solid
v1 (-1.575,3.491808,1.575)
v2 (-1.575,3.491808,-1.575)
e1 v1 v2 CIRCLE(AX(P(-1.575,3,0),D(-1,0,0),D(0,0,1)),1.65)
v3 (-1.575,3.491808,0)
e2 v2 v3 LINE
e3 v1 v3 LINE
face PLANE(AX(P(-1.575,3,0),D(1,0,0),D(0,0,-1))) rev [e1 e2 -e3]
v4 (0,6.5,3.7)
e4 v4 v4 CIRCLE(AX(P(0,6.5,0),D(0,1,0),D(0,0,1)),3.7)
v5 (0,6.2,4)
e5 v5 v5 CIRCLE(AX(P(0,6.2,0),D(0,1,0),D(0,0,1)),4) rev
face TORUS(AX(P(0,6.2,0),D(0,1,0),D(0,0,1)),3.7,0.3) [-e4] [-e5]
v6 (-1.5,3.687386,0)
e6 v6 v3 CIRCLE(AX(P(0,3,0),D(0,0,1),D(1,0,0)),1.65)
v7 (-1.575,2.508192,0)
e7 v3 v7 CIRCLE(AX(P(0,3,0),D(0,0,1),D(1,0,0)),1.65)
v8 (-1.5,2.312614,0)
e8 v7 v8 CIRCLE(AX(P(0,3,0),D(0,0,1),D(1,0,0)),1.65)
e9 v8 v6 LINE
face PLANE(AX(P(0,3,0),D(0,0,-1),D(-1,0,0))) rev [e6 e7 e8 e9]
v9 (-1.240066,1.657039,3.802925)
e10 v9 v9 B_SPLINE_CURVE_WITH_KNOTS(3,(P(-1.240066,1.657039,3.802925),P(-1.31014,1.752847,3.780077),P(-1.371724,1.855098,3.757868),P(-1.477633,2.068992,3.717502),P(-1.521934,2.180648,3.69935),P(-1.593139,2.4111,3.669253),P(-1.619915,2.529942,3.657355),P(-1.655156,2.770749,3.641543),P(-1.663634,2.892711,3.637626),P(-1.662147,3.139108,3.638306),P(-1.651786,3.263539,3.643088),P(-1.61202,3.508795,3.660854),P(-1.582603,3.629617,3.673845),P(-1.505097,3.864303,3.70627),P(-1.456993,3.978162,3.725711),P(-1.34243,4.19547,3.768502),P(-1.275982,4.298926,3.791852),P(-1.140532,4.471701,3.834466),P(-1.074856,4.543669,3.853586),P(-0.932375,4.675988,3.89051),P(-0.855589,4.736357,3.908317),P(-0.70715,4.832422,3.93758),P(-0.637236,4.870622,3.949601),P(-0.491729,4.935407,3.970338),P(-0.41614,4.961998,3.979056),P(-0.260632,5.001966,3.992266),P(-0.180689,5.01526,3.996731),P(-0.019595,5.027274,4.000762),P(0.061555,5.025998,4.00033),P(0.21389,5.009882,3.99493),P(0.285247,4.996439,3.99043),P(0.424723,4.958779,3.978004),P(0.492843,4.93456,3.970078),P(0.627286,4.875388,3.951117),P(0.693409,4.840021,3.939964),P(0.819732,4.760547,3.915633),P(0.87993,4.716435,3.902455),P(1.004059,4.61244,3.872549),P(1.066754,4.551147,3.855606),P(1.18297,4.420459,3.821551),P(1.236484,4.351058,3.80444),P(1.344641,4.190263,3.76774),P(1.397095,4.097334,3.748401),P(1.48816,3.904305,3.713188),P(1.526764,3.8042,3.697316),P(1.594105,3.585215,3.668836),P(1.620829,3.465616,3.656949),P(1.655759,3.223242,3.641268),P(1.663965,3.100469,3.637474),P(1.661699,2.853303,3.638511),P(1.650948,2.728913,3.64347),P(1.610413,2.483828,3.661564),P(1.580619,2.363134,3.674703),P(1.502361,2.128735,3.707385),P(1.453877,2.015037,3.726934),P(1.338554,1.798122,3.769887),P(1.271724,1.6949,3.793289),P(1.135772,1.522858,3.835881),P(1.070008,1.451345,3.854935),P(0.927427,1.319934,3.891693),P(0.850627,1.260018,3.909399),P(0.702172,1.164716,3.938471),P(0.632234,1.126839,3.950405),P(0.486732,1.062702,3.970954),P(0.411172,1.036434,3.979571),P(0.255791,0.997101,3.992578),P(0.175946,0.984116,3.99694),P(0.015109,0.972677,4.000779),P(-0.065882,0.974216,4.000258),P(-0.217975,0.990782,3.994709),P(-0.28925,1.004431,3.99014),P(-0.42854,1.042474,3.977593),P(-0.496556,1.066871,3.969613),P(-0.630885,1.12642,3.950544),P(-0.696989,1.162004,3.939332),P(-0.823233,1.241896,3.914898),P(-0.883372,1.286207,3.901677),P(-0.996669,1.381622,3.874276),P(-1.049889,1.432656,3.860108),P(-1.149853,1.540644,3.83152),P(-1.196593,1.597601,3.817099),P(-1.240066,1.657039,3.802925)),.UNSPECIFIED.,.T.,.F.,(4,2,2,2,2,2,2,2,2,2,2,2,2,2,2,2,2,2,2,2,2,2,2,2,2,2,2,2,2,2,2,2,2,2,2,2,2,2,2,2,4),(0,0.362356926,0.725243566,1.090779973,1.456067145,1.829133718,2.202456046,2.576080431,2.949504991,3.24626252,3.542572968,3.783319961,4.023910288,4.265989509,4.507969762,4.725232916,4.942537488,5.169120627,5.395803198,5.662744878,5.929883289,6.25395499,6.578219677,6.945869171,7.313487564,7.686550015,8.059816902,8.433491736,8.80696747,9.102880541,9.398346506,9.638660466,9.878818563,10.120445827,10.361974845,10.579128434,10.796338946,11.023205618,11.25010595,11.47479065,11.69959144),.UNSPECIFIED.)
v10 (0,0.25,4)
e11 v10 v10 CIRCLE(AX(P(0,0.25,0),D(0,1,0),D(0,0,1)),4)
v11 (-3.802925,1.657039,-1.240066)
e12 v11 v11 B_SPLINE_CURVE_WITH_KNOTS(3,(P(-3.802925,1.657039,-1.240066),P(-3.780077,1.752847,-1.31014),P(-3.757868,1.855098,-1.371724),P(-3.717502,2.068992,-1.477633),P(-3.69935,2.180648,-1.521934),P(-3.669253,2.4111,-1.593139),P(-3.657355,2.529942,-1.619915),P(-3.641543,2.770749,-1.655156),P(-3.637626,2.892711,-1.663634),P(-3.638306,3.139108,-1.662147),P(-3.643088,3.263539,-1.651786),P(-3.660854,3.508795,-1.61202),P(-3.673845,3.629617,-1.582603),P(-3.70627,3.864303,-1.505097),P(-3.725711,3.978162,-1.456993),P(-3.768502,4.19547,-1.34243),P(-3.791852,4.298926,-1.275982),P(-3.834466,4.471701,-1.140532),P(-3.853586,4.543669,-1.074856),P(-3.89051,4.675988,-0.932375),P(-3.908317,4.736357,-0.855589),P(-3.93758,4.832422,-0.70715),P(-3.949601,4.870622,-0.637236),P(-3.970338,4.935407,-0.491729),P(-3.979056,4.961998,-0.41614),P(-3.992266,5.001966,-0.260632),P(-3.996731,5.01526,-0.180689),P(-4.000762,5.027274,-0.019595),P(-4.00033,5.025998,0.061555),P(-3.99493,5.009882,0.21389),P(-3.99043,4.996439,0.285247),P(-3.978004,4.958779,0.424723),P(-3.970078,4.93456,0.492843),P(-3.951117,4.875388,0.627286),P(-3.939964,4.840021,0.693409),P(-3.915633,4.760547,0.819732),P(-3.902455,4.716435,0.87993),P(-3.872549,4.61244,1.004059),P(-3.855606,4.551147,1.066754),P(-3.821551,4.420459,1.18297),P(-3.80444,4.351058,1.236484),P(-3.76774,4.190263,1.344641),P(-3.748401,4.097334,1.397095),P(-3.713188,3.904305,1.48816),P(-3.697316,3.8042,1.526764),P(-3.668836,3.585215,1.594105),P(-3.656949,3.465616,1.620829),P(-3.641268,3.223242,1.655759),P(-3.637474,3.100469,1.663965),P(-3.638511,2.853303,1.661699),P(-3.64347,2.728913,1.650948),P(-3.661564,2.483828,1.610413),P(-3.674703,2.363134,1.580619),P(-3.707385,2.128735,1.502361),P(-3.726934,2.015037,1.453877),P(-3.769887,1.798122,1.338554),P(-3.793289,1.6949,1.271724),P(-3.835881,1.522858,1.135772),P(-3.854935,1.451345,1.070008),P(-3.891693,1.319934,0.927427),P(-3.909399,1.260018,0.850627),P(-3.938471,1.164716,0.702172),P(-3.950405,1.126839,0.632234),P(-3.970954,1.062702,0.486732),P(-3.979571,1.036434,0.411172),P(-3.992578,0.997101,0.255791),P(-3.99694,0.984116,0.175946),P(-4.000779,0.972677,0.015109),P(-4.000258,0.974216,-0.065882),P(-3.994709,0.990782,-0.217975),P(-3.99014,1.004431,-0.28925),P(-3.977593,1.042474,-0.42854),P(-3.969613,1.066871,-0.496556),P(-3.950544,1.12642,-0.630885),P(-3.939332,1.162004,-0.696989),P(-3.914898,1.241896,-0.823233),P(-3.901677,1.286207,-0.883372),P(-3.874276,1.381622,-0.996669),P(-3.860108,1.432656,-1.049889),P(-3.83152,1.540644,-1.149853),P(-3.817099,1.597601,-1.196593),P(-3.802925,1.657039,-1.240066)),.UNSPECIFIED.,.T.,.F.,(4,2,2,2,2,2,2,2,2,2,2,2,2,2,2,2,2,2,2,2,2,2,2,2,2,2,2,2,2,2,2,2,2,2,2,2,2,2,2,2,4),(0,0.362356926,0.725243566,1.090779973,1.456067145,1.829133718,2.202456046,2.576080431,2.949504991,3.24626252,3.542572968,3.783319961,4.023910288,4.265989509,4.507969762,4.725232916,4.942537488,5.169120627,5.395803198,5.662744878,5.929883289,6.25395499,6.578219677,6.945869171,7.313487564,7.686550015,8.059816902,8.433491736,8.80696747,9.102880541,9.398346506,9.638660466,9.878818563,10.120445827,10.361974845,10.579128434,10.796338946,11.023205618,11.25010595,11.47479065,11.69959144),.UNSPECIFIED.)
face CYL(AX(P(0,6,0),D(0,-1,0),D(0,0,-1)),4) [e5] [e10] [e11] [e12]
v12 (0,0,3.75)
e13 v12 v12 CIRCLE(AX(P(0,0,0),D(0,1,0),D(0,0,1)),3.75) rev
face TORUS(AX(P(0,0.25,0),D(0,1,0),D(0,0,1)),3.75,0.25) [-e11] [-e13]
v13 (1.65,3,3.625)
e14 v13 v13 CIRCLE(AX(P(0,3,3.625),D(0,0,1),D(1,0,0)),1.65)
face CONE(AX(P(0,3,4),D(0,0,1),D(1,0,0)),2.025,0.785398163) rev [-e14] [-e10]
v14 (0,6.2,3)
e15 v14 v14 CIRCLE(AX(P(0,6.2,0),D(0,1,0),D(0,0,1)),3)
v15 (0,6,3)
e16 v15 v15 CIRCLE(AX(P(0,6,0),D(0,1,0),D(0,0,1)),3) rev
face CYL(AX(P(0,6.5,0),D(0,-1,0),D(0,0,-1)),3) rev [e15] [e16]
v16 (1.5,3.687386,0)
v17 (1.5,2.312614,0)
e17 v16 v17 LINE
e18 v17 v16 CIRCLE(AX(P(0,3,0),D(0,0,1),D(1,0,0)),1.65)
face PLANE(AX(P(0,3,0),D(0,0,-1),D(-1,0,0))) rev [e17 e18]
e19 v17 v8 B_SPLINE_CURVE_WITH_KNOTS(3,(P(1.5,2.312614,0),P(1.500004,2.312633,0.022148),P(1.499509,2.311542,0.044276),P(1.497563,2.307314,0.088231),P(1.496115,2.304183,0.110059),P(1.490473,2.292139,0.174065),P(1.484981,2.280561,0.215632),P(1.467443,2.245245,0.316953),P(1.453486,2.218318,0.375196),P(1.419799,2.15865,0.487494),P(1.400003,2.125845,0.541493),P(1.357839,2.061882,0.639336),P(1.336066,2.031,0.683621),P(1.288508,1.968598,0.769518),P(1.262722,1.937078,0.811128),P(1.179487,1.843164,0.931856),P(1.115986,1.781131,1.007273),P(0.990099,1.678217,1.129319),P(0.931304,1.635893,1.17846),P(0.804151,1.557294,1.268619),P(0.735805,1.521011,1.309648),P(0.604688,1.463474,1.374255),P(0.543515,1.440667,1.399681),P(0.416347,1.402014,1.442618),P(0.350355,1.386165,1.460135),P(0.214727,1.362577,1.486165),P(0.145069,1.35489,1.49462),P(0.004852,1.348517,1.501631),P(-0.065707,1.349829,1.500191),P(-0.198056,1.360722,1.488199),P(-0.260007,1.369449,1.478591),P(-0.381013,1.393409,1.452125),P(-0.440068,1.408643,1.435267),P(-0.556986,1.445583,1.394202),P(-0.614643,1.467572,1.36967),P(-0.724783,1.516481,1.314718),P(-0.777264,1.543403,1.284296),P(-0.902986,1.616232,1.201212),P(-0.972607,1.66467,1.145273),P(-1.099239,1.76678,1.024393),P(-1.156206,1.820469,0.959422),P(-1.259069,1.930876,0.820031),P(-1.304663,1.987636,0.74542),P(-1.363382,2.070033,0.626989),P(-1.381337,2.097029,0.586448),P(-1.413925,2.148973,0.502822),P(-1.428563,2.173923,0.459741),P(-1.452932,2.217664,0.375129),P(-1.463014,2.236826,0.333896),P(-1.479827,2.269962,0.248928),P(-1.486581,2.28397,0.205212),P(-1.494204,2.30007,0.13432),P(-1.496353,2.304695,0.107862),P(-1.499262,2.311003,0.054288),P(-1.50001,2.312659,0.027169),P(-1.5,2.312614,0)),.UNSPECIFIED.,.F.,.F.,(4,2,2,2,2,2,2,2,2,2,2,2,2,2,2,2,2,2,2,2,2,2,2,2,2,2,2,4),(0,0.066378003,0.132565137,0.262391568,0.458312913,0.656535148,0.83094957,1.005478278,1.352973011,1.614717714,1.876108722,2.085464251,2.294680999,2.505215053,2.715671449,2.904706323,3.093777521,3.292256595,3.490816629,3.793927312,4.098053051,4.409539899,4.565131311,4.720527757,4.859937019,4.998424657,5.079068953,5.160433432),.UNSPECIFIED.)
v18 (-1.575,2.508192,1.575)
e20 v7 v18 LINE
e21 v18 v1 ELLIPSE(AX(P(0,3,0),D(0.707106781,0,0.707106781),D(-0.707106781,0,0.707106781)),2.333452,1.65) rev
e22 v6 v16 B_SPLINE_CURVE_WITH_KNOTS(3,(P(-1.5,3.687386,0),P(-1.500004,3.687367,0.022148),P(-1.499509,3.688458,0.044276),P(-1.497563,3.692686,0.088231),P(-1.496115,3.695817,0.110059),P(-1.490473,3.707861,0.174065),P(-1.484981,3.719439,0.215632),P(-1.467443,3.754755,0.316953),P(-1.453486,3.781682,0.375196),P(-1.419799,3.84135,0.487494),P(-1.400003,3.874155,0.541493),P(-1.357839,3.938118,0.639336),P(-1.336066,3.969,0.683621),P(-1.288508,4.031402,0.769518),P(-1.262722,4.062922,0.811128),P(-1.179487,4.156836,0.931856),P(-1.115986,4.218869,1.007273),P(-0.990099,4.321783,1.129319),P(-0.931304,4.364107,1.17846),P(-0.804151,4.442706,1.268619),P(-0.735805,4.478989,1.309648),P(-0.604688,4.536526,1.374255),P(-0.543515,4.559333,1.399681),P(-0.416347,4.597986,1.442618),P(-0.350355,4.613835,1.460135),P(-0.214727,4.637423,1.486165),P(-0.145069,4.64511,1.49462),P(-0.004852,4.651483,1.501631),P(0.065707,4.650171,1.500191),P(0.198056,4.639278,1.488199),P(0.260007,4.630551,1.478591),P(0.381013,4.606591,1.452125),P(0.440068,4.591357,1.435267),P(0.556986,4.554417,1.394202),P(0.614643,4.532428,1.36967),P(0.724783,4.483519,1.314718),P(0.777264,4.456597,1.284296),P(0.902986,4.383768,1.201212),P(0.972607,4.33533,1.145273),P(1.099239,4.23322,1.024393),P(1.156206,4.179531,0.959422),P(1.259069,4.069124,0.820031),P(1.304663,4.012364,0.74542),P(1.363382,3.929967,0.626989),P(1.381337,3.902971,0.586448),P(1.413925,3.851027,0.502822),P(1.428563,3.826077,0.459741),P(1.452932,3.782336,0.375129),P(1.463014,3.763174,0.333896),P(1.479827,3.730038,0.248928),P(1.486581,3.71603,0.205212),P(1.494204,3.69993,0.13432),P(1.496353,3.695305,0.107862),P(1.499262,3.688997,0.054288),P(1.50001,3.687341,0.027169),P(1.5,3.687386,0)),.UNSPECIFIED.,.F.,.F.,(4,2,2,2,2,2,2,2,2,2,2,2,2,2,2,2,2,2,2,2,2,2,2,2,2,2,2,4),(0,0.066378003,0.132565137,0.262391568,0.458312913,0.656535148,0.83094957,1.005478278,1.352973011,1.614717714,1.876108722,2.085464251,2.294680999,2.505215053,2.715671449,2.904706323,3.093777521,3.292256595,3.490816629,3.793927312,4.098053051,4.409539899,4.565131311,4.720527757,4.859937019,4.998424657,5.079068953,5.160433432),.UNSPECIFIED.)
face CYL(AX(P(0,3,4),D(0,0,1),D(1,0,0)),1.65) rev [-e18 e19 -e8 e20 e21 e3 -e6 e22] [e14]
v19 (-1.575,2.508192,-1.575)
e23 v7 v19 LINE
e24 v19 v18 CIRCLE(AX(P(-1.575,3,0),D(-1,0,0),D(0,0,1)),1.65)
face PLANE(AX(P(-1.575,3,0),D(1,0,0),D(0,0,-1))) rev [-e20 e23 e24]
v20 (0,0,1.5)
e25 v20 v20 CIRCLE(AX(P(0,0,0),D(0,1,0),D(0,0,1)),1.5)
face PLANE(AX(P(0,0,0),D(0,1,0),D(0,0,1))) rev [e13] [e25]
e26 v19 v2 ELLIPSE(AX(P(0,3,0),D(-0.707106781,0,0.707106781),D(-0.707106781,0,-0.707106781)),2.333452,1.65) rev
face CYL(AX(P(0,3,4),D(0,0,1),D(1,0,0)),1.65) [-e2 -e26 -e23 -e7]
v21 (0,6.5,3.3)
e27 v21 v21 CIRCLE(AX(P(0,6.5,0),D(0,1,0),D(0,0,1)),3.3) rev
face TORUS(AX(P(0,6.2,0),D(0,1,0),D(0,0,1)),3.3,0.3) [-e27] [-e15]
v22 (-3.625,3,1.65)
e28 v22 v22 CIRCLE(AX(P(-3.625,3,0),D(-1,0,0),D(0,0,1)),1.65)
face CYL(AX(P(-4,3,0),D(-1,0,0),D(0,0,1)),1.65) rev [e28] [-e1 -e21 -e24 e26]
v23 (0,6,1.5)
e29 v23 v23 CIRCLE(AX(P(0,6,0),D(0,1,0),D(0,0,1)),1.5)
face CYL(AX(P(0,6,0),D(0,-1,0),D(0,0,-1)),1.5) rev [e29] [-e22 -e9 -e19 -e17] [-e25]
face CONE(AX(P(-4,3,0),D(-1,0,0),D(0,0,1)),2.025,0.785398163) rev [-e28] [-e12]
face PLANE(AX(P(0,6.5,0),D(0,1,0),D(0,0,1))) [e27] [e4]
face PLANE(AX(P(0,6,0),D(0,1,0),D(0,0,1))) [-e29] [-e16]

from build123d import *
from OCP.BRepAlgoAPI import BRepAlgoAPI_Cut
from OCP.TopTools import TopTools_ListOfShape

# Parameters (mm, degrees)
SKETCH1_R           = 4
SKETCH1_R_2         = 1.5
BOSS_EXTRUDE1_DEPTH = 6
SKETCH2_R           = 4
SKETCH2_R_2         = 3
BOSS_EXTRUDE2_DEPTH = 0.5
FILLET1_R           = 0.3
FILLET2_R           = 0.25
CIRPATTERN1_START   = -3
CIRPATTERN1_2_DEPTH = 3


with BuildPart() as part:
    # Sketch1 → Boss-Extrude1 (new body)
    with BuildSketch(Plane(origin=(0, 0, 0), x_dir=(1, 0, 0), z_dir=(0, 1, 0))):
        with Locations(Location((0, 0, 0), (0, 0, 270))):
            Circle(SKETCH1_R)
        with Locations(Location((0, 0, 0), (0, 0, 270))):
            Circle(SKETCH1_R_2, mode=Mode.SUBTRACT)
    extrude(amount=BOSS_EXTRUDE1_DEPTH)

    # Sketch2 → Boss-Extrude2 (add)
    with BuildSketch(Plane(origin=(0, 6, 0), x_dir=(1, 0, 0), z_dir=(0, 1, 0))):
        with Locations(Location((0, 0, 0), (0, 0, 270))):
            Circle(SKETCH2_R)
        with Locations(Location((0, 0, 0), (0, 0, 270))):
            Circle(SKETCH2_R_2, mode=Mode.SUBTRACT)
    extrude(amount=BOSS_EXTRUDE2_DEPTH)

    # Fillet1
    fillet1_edges = [part.edges().sort_by_distance(p)[0] for p in [
        (0, 6.5, -4),
        (0, 6.5, -3),
    ]]
    fillet(fillet1_edges, radius=FILLET1_R)

    # Fillet2
    fillet2_edges = [part.edges().sort_by_distance(p)[0] for p in [
        (0, 0, -4),
    ]]
    fillet(fillet2_edges, radius=FILLET2_R)


with BuildPart() as m4_tapped_hole1_tool:
    # M4 Tapped Hole1: read off the stored shape, not the designer's step
    # M4 Tapped Hole1 outline → M4 Tapped Hole1 (revolve)
    with BuildSketch(Plane.XZ.offset(-3)):
        Polygon((2.024995394, 3.999995394), (0, 3.999995394), (0, 0), (1.65, 0), (1.65, 3.625), align=None)
    revolve(axis=Axis((0, 3, 0), (0, 0, 1)))


with BuildPart() as part_1:
    add(part.part)

    # M4 Tapped Hole1: cut by m4_tapped_hole1_tool, with a tolerance
    m4_tapped_hole1_stock = TopTools_ListOfShape()
    m4_tapped_hole1_stock.Append(part_1.part.wrapped)
    m4_tapped_hole1_tools = TopTools_ListOfShape()
    m4_tapped_hole1_tools.Append(m4_tapped_hole1_tool.part.wrapped)
    m4_tapped_hole1_cut = BRepAlgoAPI_Cut()
    m4_tapped_hole1_cut.SetArguments(m4_tapped_hole1_stock)
    m4_tapped_hole1_cut.SetTools(m4_tapped_hole1_tools)
    m4_tapped_hole1_cut.SetFuzzyValue(0.00001)
    m4_tapped_hole1_cut.Build()
    add(Compound.cast(m4_tapped_hole1_cut.Shape()).solids(), mode=Mode.REPLACE)

    # CirPattern1: read off the stored shape, not the designer's step
    # CirPattern1 outline → CirPattern1 (revolve, cut)
    with BuildSketch(Plane(origin=(0, 3, 0), x_dir=(0, 1, 0), z_dir=(0, 0, -1))):
        Polygon((0, -4.000116403), (2.025116403, -4.000116403), (1.65, -3.625), (1.65, -1.575), (0, -1.575), align=None)
    revolve(axis=Axis((0, 3, 0), (1, 0, 0)), mode=Mode.SUBTRACT)

    # CirPattern1 2 outline → CirPattern1 2 (add)
    with BuildSketch(Plane.XY.offset(CIRPATTERN1_START)):
        with BuildLine():
            Line((-1.575, 2.508192111), (-1.575, 3.491807889))
            ThreePointArc((-1.575, 3.491807889), (-1.65, 3), (-1.575, 2.508192111))
        make_face()
    extrude(amount=CIRPATTERN1_2_DEPTH)


solid = part_1.part
